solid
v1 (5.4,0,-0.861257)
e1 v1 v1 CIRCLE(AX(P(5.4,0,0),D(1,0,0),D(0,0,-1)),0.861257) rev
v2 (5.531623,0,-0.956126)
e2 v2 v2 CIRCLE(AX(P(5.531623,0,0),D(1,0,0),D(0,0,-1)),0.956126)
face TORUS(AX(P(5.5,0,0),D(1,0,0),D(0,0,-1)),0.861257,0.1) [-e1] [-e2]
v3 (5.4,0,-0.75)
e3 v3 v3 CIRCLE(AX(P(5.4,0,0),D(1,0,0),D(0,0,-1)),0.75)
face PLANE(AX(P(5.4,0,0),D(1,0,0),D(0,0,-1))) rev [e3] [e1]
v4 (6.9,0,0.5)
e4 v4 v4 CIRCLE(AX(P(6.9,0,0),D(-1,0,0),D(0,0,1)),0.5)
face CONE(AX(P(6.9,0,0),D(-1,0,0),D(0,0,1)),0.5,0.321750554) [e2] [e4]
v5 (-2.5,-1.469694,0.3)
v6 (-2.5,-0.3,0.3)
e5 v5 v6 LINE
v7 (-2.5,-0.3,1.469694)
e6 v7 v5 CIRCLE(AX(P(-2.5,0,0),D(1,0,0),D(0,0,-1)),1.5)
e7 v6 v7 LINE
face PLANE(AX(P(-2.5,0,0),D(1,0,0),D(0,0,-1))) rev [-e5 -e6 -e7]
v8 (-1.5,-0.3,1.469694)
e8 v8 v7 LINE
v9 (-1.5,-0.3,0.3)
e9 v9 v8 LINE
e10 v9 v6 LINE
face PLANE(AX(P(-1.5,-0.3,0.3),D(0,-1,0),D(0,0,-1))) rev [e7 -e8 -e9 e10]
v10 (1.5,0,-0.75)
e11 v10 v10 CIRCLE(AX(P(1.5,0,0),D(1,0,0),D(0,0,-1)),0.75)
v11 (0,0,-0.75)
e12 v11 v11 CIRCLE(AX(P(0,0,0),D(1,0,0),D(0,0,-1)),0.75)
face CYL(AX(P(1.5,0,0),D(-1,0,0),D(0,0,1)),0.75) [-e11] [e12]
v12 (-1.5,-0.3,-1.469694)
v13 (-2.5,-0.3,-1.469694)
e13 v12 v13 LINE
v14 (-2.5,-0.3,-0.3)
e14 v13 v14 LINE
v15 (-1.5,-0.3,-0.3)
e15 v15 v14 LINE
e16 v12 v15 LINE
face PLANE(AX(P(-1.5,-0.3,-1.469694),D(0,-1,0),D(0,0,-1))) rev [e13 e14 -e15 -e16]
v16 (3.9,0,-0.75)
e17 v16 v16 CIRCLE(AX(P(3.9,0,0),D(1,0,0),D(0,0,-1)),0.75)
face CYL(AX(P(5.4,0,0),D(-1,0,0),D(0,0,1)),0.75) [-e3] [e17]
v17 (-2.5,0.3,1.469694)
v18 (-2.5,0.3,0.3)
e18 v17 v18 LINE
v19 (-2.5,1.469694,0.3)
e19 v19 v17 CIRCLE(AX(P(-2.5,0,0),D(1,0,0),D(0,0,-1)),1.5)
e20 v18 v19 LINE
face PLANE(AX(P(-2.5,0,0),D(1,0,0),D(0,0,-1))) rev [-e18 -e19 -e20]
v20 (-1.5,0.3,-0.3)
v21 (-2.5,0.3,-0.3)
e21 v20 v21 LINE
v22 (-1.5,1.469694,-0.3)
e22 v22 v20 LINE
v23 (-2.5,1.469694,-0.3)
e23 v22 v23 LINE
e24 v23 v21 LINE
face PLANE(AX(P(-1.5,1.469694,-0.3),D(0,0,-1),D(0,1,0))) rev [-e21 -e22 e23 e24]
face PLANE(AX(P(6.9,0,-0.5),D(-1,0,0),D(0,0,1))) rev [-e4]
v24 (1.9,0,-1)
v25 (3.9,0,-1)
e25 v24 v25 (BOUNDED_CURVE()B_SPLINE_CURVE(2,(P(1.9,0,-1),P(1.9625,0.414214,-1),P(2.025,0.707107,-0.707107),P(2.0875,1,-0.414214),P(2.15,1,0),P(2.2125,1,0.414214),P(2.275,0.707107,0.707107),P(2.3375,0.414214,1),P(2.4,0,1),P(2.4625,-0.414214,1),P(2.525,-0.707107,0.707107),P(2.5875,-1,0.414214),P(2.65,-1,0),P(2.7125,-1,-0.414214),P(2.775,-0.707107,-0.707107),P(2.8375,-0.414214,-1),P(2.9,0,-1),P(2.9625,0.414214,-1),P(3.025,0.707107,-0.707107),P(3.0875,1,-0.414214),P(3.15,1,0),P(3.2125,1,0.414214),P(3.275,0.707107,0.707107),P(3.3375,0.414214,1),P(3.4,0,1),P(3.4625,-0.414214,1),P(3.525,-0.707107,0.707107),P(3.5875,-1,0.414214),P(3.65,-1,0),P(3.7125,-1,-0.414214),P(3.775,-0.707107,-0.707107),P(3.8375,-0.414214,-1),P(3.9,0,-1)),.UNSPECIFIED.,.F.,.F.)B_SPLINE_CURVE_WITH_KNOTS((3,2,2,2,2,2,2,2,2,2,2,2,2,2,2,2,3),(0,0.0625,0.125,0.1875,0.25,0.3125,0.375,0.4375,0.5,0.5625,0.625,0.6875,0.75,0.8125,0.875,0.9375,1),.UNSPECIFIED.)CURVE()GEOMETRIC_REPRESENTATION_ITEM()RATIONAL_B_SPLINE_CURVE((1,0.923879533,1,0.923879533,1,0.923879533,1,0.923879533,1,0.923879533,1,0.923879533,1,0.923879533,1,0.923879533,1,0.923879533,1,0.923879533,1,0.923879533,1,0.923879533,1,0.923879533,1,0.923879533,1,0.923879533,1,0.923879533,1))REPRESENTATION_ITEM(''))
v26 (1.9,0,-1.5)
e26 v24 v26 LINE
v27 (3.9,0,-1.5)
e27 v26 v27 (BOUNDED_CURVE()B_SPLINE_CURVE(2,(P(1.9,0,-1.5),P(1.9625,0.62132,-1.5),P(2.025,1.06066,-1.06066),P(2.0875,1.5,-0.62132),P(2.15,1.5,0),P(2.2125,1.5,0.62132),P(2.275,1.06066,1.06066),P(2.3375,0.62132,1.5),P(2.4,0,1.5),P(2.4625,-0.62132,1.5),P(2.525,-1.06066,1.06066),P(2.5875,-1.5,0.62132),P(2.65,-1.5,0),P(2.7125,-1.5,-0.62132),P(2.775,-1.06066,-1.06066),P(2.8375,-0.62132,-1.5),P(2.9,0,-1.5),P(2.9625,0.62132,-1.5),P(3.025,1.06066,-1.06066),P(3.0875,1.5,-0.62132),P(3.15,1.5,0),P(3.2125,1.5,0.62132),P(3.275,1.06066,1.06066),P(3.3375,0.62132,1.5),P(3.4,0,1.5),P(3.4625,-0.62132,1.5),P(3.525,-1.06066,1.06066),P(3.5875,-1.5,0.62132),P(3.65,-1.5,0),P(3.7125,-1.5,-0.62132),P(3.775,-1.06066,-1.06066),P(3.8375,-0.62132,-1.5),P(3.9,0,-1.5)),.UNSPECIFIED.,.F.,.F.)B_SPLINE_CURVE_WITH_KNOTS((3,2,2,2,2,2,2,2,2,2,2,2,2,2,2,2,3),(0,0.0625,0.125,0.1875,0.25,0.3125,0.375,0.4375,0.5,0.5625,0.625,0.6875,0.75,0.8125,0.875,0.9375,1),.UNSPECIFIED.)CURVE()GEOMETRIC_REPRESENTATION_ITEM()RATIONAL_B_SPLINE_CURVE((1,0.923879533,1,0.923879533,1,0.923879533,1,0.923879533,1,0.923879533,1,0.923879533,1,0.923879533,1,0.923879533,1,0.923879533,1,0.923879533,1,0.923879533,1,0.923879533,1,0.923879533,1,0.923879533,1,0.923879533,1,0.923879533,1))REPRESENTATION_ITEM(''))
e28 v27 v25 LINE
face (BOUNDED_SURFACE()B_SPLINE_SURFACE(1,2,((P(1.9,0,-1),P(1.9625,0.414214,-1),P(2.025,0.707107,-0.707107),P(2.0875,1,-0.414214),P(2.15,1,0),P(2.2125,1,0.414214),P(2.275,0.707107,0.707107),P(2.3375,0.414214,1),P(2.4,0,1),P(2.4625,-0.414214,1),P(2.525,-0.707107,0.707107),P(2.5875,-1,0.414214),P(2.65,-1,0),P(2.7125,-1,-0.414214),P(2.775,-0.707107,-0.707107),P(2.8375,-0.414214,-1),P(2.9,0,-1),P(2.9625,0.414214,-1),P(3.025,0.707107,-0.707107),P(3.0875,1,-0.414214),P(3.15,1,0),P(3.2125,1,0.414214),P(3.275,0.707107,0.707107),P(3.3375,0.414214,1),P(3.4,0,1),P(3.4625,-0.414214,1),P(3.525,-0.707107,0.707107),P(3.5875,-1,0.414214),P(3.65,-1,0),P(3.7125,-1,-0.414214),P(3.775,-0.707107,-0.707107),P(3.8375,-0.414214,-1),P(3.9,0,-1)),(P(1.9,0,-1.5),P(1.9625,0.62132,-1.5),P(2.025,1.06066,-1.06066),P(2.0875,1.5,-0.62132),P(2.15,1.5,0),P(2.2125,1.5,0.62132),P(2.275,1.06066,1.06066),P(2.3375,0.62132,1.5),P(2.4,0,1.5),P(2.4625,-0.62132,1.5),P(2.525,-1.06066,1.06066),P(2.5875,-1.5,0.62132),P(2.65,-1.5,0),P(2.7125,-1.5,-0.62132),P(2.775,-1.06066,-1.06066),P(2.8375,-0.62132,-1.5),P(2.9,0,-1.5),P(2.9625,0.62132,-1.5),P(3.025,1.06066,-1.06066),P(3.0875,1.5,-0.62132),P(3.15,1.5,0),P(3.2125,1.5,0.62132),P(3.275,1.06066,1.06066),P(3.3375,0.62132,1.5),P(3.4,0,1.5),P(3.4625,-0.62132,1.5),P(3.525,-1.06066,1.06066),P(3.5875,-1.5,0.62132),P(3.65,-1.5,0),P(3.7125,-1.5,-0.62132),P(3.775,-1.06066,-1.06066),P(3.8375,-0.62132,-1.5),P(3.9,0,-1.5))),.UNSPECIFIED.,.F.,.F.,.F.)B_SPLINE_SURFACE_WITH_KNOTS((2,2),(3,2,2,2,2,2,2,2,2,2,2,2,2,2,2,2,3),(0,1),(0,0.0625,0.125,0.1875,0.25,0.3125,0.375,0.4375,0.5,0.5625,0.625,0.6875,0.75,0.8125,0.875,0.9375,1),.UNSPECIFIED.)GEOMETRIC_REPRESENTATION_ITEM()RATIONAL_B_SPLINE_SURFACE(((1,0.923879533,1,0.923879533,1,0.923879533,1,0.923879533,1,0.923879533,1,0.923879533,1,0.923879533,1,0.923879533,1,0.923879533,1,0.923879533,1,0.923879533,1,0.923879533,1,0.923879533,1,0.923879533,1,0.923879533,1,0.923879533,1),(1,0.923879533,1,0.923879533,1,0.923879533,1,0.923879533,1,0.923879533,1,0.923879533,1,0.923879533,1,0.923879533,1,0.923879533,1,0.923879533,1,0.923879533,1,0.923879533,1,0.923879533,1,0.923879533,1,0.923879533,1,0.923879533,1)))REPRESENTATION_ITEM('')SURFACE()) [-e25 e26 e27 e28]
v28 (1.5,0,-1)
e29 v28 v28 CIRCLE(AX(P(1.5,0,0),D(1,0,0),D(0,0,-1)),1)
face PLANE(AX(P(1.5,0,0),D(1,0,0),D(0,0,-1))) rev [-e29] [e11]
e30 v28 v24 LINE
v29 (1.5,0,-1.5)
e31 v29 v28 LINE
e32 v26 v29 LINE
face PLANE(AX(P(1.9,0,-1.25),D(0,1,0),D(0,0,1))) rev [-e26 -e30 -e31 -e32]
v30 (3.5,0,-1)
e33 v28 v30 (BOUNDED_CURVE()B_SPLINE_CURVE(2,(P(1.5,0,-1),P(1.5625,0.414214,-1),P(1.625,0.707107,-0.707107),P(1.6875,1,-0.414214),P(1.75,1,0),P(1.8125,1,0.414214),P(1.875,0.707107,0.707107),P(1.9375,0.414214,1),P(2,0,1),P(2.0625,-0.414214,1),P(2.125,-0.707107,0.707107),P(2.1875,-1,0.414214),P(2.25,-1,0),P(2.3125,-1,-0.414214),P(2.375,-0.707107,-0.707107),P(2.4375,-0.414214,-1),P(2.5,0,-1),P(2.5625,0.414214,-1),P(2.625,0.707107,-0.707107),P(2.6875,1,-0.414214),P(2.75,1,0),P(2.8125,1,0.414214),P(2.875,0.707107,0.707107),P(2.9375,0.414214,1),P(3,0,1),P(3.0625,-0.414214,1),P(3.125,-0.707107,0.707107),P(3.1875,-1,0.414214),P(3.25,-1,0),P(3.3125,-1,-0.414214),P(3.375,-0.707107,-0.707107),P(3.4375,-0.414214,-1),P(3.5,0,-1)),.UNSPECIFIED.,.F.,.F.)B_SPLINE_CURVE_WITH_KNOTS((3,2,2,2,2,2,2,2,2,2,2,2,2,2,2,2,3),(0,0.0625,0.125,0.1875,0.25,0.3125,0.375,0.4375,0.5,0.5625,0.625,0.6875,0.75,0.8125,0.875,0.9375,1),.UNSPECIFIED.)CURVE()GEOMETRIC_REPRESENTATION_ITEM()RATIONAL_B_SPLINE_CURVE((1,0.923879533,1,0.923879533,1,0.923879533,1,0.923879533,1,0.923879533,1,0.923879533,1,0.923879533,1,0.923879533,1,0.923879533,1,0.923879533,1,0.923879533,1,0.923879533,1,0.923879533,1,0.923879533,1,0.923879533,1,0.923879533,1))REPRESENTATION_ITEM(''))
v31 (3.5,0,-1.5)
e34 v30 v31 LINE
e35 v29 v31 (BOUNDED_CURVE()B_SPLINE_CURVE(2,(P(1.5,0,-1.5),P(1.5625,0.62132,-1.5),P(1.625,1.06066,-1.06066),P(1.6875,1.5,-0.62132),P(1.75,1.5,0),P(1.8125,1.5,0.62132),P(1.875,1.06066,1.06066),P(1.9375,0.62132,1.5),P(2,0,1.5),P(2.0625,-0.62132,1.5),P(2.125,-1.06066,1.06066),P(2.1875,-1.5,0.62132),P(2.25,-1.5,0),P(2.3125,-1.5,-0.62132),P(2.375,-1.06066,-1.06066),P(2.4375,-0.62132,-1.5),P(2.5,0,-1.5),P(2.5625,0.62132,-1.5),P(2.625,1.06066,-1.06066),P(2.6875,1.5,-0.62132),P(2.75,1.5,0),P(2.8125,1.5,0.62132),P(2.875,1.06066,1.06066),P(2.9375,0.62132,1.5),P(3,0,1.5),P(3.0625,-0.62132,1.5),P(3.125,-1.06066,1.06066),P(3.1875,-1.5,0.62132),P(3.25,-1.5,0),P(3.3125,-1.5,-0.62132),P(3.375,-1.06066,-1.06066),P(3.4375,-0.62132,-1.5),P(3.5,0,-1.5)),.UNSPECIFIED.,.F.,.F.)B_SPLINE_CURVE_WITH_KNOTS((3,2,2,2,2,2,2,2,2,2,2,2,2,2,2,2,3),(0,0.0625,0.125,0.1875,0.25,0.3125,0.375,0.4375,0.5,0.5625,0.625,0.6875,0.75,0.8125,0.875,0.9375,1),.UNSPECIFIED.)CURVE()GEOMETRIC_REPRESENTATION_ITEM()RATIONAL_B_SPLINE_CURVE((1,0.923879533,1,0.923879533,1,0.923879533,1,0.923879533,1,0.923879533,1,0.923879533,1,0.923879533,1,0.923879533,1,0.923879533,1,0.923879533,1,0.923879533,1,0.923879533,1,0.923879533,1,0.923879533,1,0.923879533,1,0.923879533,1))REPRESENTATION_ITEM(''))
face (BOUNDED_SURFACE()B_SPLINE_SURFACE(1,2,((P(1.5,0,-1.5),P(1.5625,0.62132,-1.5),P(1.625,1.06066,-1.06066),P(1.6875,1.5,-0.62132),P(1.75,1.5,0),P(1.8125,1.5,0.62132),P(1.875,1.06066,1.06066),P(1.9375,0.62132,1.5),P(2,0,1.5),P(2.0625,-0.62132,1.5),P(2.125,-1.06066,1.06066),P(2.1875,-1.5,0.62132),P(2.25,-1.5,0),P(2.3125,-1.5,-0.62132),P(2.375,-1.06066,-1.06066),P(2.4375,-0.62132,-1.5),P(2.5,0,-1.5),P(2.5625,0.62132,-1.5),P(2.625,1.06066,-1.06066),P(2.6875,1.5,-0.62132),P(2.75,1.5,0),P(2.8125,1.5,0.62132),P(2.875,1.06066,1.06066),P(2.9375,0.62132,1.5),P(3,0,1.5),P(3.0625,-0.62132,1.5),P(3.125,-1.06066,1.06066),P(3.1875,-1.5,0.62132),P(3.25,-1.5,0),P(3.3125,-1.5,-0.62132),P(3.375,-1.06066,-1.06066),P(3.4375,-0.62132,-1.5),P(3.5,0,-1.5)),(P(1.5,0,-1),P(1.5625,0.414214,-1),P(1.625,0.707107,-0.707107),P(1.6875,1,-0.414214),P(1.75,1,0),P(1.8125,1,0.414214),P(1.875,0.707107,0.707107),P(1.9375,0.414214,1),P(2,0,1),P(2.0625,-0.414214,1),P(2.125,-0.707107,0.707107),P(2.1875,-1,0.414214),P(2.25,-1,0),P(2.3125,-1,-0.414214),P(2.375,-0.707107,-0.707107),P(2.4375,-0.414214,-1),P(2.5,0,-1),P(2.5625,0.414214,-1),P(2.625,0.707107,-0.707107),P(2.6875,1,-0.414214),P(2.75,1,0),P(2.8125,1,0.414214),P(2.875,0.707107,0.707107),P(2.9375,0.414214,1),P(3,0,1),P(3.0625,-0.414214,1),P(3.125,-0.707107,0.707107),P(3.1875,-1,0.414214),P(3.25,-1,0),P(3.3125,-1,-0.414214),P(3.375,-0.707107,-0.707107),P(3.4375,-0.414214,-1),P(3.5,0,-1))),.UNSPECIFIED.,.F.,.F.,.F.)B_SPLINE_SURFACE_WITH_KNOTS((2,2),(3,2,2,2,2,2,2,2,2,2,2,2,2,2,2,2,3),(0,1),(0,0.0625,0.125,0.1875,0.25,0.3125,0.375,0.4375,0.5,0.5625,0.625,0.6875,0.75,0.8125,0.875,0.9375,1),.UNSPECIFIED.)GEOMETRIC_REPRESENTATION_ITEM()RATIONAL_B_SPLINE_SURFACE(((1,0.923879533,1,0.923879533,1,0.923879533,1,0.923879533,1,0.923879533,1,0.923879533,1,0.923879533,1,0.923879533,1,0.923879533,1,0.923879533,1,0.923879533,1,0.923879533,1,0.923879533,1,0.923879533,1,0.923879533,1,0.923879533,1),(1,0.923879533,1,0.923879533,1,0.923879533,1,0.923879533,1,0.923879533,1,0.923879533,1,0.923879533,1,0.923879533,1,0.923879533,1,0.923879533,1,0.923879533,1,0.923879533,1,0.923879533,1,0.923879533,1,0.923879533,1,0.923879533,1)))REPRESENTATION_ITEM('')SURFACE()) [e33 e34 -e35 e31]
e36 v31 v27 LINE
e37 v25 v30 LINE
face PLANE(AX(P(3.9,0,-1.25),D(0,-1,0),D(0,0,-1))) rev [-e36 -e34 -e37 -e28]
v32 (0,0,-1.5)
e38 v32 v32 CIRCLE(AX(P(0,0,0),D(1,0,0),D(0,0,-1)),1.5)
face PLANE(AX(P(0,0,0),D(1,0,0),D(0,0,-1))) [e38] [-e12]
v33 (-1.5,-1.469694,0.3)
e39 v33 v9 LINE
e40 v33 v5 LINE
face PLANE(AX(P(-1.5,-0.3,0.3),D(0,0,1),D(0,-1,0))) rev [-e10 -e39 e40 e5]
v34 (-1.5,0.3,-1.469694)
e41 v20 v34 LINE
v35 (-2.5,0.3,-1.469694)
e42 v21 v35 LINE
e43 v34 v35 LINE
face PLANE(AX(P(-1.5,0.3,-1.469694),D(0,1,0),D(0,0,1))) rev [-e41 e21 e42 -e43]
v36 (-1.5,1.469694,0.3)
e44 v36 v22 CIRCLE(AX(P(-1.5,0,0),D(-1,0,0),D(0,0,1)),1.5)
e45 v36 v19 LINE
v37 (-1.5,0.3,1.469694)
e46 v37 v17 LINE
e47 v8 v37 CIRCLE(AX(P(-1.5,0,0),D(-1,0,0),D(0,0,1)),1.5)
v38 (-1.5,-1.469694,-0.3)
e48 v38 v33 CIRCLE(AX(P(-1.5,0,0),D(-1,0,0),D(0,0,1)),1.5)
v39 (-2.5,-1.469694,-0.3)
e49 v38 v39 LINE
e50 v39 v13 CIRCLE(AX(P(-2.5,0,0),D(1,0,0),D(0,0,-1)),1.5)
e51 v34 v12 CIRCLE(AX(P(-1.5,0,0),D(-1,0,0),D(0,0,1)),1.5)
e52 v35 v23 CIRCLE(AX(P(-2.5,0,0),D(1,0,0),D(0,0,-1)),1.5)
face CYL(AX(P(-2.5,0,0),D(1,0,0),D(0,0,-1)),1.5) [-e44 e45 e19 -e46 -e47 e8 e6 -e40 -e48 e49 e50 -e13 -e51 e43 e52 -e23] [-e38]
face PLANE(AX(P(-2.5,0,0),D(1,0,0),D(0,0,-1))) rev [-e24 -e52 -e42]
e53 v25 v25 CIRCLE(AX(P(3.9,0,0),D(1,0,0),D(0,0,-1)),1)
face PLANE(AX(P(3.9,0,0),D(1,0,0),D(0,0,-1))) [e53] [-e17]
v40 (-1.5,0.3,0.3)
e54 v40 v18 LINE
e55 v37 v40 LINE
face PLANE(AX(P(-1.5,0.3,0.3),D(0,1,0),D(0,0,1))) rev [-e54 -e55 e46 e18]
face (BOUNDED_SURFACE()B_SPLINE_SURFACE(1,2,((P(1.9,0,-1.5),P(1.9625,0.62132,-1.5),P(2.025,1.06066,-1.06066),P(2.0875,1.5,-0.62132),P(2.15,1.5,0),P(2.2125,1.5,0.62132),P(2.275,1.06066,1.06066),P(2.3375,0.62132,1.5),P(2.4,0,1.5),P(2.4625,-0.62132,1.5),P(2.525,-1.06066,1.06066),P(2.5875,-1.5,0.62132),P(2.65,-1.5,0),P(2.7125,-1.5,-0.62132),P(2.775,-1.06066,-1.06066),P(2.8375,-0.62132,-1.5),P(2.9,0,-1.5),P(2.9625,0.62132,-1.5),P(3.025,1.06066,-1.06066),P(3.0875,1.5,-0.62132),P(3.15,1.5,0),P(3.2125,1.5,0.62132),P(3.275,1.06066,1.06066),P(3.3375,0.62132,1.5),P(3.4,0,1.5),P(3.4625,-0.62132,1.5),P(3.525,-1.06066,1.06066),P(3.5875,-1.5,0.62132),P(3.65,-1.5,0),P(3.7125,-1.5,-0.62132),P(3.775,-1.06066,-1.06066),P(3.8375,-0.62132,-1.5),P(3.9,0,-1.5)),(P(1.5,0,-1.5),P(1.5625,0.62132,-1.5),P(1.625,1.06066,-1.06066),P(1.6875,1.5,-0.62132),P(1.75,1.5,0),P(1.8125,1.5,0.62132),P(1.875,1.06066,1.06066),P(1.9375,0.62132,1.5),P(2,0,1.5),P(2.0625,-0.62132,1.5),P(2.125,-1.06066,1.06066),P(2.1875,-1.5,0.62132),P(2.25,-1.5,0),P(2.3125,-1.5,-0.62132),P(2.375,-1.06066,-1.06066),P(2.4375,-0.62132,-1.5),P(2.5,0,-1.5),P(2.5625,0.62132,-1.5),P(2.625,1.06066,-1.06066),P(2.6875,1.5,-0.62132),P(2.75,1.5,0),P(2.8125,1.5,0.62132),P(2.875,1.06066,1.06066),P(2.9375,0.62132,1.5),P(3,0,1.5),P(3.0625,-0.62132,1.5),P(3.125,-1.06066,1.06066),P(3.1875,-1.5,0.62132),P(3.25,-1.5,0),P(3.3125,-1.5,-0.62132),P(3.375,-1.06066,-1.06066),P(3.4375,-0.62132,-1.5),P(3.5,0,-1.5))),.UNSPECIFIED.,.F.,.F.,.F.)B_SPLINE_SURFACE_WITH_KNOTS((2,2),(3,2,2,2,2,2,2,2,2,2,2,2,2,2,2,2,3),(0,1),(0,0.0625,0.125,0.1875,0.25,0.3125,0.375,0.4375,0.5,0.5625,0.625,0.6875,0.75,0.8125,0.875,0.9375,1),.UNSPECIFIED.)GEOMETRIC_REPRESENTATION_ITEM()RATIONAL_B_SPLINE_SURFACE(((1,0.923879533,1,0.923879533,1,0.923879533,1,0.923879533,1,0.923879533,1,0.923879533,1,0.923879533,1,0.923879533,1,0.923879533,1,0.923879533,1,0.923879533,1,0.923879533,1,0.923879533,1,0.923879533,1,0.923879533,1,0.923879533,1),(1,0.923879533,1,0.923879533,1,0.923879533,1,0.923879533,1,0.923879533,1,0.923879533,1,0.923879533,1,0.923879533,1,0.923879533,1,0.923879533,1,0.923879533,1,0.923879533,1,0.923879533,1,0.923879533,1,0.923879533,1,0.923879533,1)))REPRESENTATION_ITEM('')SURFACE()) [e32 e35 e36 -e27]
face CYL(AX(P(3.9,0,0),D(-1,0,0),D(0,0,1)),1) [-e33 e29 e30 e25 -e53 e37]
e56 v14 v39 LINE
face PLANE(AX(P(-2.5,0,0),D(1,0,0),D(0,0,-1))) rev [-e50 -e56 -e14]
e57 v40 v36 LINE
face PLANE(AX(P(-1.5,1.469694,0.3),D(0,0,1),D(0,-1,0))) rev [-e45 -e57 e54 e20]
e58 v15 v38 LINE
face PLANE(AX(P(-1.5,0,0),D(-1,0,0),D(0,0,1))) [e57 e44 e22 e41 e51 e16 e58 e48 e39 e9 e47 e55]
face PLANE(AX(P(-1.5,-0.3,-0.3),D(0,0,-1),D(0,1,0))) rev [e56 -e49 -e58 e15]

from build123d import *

# Parameters (mm, degrees)
SKETCH1_R           = 0.75
BOSS_EXTRUDE4_DEPTH = 1.5
SKETCH1_6_R         = 1.5
BOSS_EXTRUDE5_DEPTH = 2.5
BOSS_EXTRUDE6_START = 1.5
SKETCH1_7_R         = 1
BOSS_EXTRUDE6_DEPTH = 2.4
SWEEP2_PITCH        = 1
BOSS_EXTRUDE7_START = 3.9
SKETCH1_8_R         = 0.75
BOSS_EXTRUDE7_DEPTH = 1.5
CUT_EXTRUDE2_START  = -1
CUT_EXTRUDE2_DEPTH  = 1
FILLET2_R           = 0.1


with BuildPart() as part:
    # Sketch1 → Boss-Extrude4 (new body)
    with BuildSketch(Plane(origin=(0, 0, 0), x_dir=(0, 0, -1), z_dir=(1, 0, 0))):
        Circle(SKETCH1_R)
    extrude(amount=BOSS_EXTRUDE4_DEPTH)

    # Sketch1<6> → Boss-Extrude5 (add)
    with BuildSketch(Plane(origin=(0, 0, 0), x_dir=(0, 0, -1), z_dir=(1, 0, 0))):
        Circle(SKETCH1_6_R)
    extrude(amount=-BOSS_EXTRUDE5_DEPTH)

    # Sketch1<7> → Boss-Extrude6 (add)
    with BuildSketch(Plane(origin=(0, 0, 0), x_dir=(0, 0, -1), z_dir=(1, 0, 0)).offset(BOSS_EXTRUDE6_START)):
        Circle(SKETCH1_7_R)
    extrude(amount=BOSS_EXTRUDE6_DEPTH)

    # Sweep2: the profile of Sketch7 profile screwed along a right-hand helix of 2 turns, 8 arcs to a turn; built about Z, then put on its axis
    sweep2_z = Axis((0, 0, 0), (0, 0, 1))
    sweep2_corners = [(1.5003, 0, -0.25), (1.5003, 0, 0.15), (1, 0, 0.15), (1, 0, -0.25)]
    with BuildLine(mode=Mode.PRIVATE) as sweep2_profile:
        Line(sweep2_corners[0], sweep2_corners[1])
        Line(sweep2_corners[1], sweep2_corners[2])
        Line(sweep2_corners[2], sweep2_corners[3])
        Line(sweep2_corners[3], sweep2_corners[0])
    sweep2_cap = Face(sweep2_profile.wire())
    sweep2_turn_angles = [0, 22.5, 45, 67.5, 90, 112.5, 135, 157.5, 180, 202.5, 225, 247.5, 270, 292.5, 315, 337.5, 360]
    sweep2_turn_weights = [1, 0.9238795325112867, 1, 0.9238795325112867, 1, 0.9238795325112867, 1, 0.9238795325112867, 1, 0.9238795325112867, 1, 0.9238795325112867, 1, 0.9238795325112867, 1, 0.9238795325112867, 1]
    sweep2_turn_rails = [Edge.make_bspline([Vector(p[0], p[1], 0).rotate(sweep2_z, sweep2_turn_angles[k]) / sweep2_turn_weights[k] + Vector(0, 0, p[2] + SWEEP2_PITCH * sweep2_turn_angles[k] / 360) for k in range(17)], [0, 0, 0, 1, 1, 2, 2, 3, 3, 4, 4, 5, 5, 6, 6, 7, 7, 8, 8, 8], 2, sweep2_turn_weights) for p in sweep2_corners]
    sweep2_turn_sides = [Face.make_surface_from_curves(sweep2_turn_rails[p[0]], sweep2_turn_rails[p[1]]) for p in [(0, 1), (1, 2), (2, 3), (3, 0)]]
    sweep2 = Plane(origin=(1.75, 0, 0), x_dir=(0, 0, -1), z_dir=(1, 0, 0)) * Solid(Shell([*[p.moved(Location((0, 0, SWEEP2_PITCH * i))) for i in range(2) for p in sweep2_turn_sides], sweep2_cap, sweep2_cap.rotate(sweep2_z, 720).moved(Location((0, 0, SWEEP2_PITCH * 720 / 360)))]))
    add(sweep2)

    # Sketch1<8> → Boss-Extrude7 (add)
    with BuildSketch(Plane(origin=(0, 0, 0), x_dir=(0, 0, -1), z_dir=(1, 0, 0)).offset(BOSS_EXTRUDE7_START)):
        Circle(SKETCH1_8_R)
    extrude(amount=BOSS_EXTRUDE7_DEPTH)

    # Sketch8 → Cut-Extrude2 (cut)
    with BuildSketch(Plane.ZY.offset(2.5).offset(CUT_EXTRUDE2_START)):
        with BuildLine():
            Line((0.3, 1.469693846), (0.3, 0.3))
            Line((0.3, 0.3), (1.469693846, 0.3))
            ThreePointArc((1.469693846, 0.3), (1.5, 0), (1.469693846, -0.3))
            Line((1.469693846, -0.3), (0.3, -0.3))
            Line((0.3, -0.3), (0.3, -1.469693846))
            ThreePointArc((0.3, -1.469693846), (0, -1.5), (-0.3, -1.469693846))
            Line((-0.3, -1.469693846), (-0.3, -0.3))
            Line((-0.3, -0.3), (-1.469693846, -0.3))
            ThreePointArc((-1.469693846, -0.3), (-1.5, 0), (-1.469693846, 0.3))
            Line((-1.469693846, 0.3), (-0.3, 0.3))
            Line((-0.3, 0.3), (-0.3, 1.469693846))
            ThreePointArc((-0.3, 1.469693846), (0, 1.5), (0.3, 1.469693846))
        make_face()
    extrude(amount=CUT_EXTRUDE2_DEPTH, mode=Mode.SUBTRACT)

    # Sketch9 → Revolve2 (revolve)
    with BuildSketch(Plane(origin=(0, 0, 0), x_dir=(1, 0, 0), z_dir=(0, 1, 0)), mode=Mode.PRIVATE) as revolve2_sk:
        Polygon((5.4, 0), (5.4, 1), (6.9, 0.5), (6.9, 0), align=None)
    revolve(revolve2_sk.sketch.rotate(Axis((0, 0, 0), (1, 0, 0)), 180), axis=Axis((0, 0, 0), (1, 0, 0)))

    # Fillet2
    fillet2_edges = [part.edges().sort_by_distance(p)[0] for p in [
        (5.4, 0, -1),
    ]]
    fillet(fillet2_edges, radius=FILLET2_R)


solid = part.part
